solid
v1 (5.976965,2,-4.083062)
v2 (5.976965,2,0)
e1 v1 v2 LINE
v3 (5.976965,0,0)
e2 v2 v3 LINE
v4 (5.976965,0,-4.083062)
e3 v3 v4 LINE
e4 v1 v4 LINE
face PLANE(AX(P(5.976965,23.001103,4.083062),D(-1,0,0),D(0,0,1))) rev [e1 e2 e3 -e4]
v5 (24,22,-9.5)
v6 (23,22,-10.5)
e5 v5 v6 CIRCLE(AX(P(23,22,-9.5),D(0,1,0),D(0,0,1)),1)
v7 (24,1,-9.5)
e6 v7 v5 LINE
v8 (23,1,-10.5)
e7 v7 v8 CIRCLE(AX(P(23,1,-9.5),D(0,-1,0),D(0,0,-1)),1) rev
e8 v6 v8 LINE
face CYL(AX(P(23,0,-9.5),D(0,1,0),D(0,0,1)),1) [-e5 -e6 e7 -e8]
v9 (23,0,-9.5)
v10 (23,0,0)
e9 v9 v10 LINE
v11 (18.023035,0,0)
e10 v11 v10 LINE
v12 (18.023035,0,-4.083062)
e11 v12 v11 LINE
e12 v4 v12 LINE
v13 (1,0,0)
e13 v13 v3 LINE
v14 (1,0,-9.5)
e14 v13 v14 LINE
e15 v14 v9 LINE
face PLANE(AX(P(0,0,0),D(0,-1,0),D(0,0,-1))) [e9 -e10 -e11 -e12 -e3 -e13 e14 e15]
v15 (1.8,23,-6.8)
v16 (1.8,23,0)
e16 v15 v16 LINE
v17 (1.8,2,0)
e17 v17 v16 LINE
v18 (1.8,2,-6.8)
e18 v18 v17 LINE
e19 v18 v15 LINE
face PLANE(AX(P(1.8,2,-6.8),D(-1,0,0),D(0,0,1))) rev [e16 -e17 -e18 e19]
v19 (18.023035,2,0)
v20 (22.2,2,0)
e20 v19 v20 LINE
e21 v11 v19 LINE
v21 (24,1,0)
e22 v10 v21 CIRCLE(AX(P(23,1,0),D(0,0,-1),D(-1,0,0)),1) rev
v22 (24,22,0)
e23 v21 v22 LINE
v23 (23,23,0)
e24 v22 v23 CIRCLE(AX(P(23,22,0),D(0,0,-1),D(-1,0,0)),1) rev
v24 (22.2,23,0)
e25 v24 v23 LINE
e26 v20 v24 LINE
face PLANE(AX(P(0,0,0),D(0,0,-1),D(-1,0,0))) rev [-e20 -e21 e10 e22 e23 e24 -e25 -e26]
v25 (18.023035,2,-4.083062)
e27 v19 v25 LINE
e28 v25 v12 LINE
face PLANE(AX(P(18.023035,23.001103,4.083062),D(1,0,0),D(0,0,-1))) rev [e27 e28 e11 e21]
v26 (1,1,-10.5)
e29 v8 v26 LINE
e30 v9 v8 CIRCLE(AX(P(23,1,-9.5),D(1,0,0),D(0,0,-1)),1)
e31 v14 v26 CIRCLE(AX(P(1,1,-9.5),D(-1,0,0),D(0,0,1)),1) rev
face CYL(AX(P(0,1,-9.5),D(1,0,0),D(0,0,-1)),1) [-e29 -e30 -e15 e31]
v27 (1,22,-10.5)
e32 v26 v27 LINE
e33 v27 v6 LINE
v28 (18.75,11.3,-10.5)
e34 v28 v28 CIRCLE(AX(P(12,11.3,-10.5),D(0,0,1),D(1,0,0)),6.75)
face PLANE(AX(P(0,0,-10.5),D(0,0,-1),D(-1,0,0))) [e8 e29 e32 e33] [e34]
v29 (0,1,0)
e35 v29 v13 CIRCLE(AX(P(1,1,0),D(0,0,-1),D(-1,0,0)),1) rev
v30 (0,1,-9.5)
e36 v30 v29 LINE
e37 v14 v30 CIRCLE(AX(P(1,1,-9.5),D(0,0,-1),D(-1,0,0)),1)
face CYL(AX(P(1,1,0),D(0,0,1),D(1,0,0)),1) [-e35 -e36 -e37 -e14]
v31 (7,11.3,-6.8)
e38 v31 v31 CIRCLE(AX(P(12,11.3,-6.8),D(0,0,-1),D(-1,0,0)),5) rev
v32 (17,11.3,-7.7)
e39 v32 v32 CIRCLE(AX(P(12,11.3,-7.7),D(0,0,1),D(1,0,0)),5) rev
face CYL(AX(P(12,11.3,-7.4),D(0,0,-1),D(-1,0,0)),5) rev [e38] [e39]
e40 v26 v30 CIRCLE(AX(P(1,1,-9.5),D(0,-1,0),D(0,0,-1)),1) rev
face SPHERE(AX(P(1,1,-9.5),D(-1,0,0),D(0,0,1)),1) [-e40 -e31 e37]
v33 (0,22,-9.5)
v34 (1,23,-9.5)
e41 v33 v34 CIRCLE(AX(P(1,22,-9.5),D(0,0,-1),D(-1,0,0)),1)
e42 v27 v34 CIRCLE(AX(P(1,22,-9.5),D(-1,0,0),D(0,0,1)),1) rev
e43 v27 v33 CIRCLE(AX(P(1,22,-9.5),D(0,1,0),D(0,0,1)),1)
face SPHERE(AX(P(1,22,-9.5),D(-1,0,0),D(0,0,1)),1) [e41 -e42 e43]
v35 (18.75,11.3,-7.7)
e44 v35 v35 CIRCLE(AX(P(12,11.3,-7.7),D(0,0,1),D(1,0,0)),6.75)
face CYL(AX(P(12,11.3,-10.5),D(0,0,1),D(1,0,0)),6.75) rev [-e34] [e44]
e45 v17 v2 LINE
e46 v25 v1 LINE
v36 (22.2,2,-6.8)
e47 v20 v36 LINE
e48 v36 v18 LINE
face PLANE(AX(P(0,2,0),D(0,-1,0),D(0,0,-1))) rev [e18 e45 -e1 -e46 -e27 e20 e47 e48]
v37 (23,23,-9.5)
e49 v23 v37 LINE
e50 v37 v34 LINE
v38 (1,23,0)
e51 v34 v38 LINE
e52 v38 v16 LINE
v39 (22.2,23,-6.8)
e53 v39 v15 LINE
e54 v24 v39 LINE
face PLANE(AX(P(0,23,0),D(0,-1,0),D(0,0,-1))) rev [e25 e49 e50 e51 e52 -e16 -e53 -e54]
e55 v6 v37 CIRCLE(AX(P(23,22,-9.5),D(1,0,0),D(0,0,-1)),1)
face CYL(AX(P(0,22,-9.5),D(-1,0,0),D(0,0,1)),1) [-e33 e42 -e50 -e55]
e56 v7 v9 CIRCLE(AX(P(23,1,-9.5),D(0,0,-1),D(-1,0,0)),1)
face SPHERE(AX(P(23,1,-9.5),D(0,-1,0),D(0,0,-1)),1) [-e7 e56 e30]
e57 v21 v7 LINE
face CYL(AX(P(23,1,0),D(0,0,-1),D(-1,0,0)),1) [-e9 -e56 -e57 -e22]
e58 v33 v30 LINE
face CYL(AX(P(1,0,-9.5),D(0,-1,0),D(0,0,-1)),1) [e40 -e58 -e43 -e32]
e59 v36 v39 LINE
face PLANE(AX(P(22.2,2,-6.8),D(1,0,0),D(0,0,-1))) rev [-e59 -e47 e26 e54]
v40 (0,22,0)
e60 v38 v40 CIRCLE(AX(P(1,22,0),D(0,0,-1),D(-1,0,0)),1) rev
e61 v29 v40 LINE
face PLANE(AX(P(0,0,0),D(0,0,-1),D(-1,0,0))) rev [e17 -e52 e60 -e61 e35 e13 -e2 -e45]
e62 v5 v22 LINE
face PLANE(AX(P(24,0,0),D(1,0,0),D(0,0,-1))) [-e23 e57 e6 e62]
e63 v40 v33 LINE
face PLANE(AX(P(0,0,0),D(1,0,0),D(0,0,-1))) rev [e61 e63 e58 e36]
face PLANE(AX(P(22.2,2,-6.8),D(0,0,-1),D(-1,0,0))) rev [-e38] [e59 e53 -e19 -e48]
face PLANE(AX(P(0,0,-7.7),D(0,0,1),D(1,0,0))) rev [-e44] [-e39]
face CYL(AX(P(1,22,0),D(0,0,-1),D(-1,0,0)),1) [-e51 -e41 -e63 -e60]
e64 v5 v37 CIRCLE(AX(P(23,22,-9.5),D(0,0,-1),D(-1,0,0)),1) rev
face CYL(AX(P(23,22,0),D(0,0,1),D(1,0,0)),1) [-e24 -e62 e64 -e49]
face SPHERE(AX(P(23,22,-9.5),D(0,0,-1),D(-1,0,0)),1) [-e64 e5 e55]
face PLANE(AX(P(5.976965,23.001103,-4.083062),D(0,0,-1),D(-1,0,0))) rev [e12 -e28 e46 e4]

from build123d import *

# Parameters (mm, degrees)
EXTRUDE_1_DEPTH         = 24
SKETCH_2_W              = 20.4
SKETCH_2_H              = 6.8
CUT_EXTRUDE_1_DEPTH     = 21
CUT_EXTRUDE_2_REACH     = 36.86
SKETCH_3_W              = 12.046070068
SKETCH_3_H              = 8.16612352
FILLET_1_R              = 1
CUT_EXTRUDE_START       = -10.5
CUT_EXTRUDE_3_OUTLINE_R = 6.75
CUT_EXTRUDE_3_DEPTH     = 2.8
CUT_EXTRUDE_START_2     = -7.7
CUT_EXTRUDE_4_OUTLINE_R = 5
CUT_EXTRUDE_4_DEPTH     = 0.9


# Read off the part's stored shape, not the designer's step: the extrude step, the extrude step
with BuildPart() as part:
    # Sketch 3D_1 → Extrude 1 (new body)
    with BuildSketch(Plane(origin=(0, 0, 0), x_dir=(0, 0.909688003863034, -0.41529234958964595), z_dir=(1, 0, 0))):
        Polygon((0, 0), (20.922824089, 9.551724041), (25.28339376, 0), (4.360569671, -9.551724041), align=None)
    extrude(amount=EXTRUDE_1_DEPTH)

    # Sketch 2 → Cut-Extrude 1 (cut)
    with BuildSketch(Plane(origin=(0, 23, 0), x_dir=(1, 0, 0), z_dir=(0, 1, 0))):
        with Locations((12, 3.4)):
            Rectangle(SKETCH_2_W, SKETCH_2_H)
    extrude(amount=-CUT_EXTRUDE_1_DEPTH, mode=Mode.SUBTRACT)

    # Sketch 3 → Cut-Extrude 2 (cut, up to next)
    with BuildSketch(Plane.XZ, mode=Mode.PRIVATE) as cut_extrude_2_sk1:
        with Locations((12, 0)):
            Rectangle(SKETCH_3_W, SKETCH_3_H)
    cut_extrude_2_tool1 = extrude(cut_extrude_2_sk1.sketch, amount=-CUT_EXTRUDE_2_REACH, mode=Mode.PRIVATE) & part.part
    add(cut_extrude_2_tool1.solids().sort_by_distance((12, 0, 0))[0], mode=Mode.SUBTRACT)

    # Fillet 1
    fillet_1_edges = [part.edges().sort_by_distance(p)[0] for p in [
        (24, 23, -5.25),
        (24, 0, -5.25),
        (24, 11.5, -10.5),
        (12, 0, -10.5),
        (0, 0, -5.25),
        (0, 11.5, -10.5),
        (12, 23, -10.5),
        (0, 23, -5.25),
    ]]
    fillet(fillet_1_edges, radius=FILLET_1_R)

    # Cut-Extrude 3 outline → Cut-Extrude 3 (cut)
    with BuildSketch(Plane.XY.offset(CUT_EXTRUDE_START)):
        with Locations((12, 11.3)):
            Circle(CUT_EXTRUDE_3_OUTLINE_R)
    extrude(amount=CUT_EXTRUDE_3_DEPTH, mode=Mode.SUBTRACT)

    # Cut-Extrude 4 outline → Cut-Extrude 4 (cut)
    with BuildSketch(Plane.XY.offset(CUT_EXTRUDE_START_2)):
        with Locations((12, 11.3)):
            Circle(CUT_EXTRUDE_4_OUTLINE_R)
    extrude(amount=CUT_EXTRUDE_4_DEPTH, mode=Mode.SUBTRACT)


solid = part.part
